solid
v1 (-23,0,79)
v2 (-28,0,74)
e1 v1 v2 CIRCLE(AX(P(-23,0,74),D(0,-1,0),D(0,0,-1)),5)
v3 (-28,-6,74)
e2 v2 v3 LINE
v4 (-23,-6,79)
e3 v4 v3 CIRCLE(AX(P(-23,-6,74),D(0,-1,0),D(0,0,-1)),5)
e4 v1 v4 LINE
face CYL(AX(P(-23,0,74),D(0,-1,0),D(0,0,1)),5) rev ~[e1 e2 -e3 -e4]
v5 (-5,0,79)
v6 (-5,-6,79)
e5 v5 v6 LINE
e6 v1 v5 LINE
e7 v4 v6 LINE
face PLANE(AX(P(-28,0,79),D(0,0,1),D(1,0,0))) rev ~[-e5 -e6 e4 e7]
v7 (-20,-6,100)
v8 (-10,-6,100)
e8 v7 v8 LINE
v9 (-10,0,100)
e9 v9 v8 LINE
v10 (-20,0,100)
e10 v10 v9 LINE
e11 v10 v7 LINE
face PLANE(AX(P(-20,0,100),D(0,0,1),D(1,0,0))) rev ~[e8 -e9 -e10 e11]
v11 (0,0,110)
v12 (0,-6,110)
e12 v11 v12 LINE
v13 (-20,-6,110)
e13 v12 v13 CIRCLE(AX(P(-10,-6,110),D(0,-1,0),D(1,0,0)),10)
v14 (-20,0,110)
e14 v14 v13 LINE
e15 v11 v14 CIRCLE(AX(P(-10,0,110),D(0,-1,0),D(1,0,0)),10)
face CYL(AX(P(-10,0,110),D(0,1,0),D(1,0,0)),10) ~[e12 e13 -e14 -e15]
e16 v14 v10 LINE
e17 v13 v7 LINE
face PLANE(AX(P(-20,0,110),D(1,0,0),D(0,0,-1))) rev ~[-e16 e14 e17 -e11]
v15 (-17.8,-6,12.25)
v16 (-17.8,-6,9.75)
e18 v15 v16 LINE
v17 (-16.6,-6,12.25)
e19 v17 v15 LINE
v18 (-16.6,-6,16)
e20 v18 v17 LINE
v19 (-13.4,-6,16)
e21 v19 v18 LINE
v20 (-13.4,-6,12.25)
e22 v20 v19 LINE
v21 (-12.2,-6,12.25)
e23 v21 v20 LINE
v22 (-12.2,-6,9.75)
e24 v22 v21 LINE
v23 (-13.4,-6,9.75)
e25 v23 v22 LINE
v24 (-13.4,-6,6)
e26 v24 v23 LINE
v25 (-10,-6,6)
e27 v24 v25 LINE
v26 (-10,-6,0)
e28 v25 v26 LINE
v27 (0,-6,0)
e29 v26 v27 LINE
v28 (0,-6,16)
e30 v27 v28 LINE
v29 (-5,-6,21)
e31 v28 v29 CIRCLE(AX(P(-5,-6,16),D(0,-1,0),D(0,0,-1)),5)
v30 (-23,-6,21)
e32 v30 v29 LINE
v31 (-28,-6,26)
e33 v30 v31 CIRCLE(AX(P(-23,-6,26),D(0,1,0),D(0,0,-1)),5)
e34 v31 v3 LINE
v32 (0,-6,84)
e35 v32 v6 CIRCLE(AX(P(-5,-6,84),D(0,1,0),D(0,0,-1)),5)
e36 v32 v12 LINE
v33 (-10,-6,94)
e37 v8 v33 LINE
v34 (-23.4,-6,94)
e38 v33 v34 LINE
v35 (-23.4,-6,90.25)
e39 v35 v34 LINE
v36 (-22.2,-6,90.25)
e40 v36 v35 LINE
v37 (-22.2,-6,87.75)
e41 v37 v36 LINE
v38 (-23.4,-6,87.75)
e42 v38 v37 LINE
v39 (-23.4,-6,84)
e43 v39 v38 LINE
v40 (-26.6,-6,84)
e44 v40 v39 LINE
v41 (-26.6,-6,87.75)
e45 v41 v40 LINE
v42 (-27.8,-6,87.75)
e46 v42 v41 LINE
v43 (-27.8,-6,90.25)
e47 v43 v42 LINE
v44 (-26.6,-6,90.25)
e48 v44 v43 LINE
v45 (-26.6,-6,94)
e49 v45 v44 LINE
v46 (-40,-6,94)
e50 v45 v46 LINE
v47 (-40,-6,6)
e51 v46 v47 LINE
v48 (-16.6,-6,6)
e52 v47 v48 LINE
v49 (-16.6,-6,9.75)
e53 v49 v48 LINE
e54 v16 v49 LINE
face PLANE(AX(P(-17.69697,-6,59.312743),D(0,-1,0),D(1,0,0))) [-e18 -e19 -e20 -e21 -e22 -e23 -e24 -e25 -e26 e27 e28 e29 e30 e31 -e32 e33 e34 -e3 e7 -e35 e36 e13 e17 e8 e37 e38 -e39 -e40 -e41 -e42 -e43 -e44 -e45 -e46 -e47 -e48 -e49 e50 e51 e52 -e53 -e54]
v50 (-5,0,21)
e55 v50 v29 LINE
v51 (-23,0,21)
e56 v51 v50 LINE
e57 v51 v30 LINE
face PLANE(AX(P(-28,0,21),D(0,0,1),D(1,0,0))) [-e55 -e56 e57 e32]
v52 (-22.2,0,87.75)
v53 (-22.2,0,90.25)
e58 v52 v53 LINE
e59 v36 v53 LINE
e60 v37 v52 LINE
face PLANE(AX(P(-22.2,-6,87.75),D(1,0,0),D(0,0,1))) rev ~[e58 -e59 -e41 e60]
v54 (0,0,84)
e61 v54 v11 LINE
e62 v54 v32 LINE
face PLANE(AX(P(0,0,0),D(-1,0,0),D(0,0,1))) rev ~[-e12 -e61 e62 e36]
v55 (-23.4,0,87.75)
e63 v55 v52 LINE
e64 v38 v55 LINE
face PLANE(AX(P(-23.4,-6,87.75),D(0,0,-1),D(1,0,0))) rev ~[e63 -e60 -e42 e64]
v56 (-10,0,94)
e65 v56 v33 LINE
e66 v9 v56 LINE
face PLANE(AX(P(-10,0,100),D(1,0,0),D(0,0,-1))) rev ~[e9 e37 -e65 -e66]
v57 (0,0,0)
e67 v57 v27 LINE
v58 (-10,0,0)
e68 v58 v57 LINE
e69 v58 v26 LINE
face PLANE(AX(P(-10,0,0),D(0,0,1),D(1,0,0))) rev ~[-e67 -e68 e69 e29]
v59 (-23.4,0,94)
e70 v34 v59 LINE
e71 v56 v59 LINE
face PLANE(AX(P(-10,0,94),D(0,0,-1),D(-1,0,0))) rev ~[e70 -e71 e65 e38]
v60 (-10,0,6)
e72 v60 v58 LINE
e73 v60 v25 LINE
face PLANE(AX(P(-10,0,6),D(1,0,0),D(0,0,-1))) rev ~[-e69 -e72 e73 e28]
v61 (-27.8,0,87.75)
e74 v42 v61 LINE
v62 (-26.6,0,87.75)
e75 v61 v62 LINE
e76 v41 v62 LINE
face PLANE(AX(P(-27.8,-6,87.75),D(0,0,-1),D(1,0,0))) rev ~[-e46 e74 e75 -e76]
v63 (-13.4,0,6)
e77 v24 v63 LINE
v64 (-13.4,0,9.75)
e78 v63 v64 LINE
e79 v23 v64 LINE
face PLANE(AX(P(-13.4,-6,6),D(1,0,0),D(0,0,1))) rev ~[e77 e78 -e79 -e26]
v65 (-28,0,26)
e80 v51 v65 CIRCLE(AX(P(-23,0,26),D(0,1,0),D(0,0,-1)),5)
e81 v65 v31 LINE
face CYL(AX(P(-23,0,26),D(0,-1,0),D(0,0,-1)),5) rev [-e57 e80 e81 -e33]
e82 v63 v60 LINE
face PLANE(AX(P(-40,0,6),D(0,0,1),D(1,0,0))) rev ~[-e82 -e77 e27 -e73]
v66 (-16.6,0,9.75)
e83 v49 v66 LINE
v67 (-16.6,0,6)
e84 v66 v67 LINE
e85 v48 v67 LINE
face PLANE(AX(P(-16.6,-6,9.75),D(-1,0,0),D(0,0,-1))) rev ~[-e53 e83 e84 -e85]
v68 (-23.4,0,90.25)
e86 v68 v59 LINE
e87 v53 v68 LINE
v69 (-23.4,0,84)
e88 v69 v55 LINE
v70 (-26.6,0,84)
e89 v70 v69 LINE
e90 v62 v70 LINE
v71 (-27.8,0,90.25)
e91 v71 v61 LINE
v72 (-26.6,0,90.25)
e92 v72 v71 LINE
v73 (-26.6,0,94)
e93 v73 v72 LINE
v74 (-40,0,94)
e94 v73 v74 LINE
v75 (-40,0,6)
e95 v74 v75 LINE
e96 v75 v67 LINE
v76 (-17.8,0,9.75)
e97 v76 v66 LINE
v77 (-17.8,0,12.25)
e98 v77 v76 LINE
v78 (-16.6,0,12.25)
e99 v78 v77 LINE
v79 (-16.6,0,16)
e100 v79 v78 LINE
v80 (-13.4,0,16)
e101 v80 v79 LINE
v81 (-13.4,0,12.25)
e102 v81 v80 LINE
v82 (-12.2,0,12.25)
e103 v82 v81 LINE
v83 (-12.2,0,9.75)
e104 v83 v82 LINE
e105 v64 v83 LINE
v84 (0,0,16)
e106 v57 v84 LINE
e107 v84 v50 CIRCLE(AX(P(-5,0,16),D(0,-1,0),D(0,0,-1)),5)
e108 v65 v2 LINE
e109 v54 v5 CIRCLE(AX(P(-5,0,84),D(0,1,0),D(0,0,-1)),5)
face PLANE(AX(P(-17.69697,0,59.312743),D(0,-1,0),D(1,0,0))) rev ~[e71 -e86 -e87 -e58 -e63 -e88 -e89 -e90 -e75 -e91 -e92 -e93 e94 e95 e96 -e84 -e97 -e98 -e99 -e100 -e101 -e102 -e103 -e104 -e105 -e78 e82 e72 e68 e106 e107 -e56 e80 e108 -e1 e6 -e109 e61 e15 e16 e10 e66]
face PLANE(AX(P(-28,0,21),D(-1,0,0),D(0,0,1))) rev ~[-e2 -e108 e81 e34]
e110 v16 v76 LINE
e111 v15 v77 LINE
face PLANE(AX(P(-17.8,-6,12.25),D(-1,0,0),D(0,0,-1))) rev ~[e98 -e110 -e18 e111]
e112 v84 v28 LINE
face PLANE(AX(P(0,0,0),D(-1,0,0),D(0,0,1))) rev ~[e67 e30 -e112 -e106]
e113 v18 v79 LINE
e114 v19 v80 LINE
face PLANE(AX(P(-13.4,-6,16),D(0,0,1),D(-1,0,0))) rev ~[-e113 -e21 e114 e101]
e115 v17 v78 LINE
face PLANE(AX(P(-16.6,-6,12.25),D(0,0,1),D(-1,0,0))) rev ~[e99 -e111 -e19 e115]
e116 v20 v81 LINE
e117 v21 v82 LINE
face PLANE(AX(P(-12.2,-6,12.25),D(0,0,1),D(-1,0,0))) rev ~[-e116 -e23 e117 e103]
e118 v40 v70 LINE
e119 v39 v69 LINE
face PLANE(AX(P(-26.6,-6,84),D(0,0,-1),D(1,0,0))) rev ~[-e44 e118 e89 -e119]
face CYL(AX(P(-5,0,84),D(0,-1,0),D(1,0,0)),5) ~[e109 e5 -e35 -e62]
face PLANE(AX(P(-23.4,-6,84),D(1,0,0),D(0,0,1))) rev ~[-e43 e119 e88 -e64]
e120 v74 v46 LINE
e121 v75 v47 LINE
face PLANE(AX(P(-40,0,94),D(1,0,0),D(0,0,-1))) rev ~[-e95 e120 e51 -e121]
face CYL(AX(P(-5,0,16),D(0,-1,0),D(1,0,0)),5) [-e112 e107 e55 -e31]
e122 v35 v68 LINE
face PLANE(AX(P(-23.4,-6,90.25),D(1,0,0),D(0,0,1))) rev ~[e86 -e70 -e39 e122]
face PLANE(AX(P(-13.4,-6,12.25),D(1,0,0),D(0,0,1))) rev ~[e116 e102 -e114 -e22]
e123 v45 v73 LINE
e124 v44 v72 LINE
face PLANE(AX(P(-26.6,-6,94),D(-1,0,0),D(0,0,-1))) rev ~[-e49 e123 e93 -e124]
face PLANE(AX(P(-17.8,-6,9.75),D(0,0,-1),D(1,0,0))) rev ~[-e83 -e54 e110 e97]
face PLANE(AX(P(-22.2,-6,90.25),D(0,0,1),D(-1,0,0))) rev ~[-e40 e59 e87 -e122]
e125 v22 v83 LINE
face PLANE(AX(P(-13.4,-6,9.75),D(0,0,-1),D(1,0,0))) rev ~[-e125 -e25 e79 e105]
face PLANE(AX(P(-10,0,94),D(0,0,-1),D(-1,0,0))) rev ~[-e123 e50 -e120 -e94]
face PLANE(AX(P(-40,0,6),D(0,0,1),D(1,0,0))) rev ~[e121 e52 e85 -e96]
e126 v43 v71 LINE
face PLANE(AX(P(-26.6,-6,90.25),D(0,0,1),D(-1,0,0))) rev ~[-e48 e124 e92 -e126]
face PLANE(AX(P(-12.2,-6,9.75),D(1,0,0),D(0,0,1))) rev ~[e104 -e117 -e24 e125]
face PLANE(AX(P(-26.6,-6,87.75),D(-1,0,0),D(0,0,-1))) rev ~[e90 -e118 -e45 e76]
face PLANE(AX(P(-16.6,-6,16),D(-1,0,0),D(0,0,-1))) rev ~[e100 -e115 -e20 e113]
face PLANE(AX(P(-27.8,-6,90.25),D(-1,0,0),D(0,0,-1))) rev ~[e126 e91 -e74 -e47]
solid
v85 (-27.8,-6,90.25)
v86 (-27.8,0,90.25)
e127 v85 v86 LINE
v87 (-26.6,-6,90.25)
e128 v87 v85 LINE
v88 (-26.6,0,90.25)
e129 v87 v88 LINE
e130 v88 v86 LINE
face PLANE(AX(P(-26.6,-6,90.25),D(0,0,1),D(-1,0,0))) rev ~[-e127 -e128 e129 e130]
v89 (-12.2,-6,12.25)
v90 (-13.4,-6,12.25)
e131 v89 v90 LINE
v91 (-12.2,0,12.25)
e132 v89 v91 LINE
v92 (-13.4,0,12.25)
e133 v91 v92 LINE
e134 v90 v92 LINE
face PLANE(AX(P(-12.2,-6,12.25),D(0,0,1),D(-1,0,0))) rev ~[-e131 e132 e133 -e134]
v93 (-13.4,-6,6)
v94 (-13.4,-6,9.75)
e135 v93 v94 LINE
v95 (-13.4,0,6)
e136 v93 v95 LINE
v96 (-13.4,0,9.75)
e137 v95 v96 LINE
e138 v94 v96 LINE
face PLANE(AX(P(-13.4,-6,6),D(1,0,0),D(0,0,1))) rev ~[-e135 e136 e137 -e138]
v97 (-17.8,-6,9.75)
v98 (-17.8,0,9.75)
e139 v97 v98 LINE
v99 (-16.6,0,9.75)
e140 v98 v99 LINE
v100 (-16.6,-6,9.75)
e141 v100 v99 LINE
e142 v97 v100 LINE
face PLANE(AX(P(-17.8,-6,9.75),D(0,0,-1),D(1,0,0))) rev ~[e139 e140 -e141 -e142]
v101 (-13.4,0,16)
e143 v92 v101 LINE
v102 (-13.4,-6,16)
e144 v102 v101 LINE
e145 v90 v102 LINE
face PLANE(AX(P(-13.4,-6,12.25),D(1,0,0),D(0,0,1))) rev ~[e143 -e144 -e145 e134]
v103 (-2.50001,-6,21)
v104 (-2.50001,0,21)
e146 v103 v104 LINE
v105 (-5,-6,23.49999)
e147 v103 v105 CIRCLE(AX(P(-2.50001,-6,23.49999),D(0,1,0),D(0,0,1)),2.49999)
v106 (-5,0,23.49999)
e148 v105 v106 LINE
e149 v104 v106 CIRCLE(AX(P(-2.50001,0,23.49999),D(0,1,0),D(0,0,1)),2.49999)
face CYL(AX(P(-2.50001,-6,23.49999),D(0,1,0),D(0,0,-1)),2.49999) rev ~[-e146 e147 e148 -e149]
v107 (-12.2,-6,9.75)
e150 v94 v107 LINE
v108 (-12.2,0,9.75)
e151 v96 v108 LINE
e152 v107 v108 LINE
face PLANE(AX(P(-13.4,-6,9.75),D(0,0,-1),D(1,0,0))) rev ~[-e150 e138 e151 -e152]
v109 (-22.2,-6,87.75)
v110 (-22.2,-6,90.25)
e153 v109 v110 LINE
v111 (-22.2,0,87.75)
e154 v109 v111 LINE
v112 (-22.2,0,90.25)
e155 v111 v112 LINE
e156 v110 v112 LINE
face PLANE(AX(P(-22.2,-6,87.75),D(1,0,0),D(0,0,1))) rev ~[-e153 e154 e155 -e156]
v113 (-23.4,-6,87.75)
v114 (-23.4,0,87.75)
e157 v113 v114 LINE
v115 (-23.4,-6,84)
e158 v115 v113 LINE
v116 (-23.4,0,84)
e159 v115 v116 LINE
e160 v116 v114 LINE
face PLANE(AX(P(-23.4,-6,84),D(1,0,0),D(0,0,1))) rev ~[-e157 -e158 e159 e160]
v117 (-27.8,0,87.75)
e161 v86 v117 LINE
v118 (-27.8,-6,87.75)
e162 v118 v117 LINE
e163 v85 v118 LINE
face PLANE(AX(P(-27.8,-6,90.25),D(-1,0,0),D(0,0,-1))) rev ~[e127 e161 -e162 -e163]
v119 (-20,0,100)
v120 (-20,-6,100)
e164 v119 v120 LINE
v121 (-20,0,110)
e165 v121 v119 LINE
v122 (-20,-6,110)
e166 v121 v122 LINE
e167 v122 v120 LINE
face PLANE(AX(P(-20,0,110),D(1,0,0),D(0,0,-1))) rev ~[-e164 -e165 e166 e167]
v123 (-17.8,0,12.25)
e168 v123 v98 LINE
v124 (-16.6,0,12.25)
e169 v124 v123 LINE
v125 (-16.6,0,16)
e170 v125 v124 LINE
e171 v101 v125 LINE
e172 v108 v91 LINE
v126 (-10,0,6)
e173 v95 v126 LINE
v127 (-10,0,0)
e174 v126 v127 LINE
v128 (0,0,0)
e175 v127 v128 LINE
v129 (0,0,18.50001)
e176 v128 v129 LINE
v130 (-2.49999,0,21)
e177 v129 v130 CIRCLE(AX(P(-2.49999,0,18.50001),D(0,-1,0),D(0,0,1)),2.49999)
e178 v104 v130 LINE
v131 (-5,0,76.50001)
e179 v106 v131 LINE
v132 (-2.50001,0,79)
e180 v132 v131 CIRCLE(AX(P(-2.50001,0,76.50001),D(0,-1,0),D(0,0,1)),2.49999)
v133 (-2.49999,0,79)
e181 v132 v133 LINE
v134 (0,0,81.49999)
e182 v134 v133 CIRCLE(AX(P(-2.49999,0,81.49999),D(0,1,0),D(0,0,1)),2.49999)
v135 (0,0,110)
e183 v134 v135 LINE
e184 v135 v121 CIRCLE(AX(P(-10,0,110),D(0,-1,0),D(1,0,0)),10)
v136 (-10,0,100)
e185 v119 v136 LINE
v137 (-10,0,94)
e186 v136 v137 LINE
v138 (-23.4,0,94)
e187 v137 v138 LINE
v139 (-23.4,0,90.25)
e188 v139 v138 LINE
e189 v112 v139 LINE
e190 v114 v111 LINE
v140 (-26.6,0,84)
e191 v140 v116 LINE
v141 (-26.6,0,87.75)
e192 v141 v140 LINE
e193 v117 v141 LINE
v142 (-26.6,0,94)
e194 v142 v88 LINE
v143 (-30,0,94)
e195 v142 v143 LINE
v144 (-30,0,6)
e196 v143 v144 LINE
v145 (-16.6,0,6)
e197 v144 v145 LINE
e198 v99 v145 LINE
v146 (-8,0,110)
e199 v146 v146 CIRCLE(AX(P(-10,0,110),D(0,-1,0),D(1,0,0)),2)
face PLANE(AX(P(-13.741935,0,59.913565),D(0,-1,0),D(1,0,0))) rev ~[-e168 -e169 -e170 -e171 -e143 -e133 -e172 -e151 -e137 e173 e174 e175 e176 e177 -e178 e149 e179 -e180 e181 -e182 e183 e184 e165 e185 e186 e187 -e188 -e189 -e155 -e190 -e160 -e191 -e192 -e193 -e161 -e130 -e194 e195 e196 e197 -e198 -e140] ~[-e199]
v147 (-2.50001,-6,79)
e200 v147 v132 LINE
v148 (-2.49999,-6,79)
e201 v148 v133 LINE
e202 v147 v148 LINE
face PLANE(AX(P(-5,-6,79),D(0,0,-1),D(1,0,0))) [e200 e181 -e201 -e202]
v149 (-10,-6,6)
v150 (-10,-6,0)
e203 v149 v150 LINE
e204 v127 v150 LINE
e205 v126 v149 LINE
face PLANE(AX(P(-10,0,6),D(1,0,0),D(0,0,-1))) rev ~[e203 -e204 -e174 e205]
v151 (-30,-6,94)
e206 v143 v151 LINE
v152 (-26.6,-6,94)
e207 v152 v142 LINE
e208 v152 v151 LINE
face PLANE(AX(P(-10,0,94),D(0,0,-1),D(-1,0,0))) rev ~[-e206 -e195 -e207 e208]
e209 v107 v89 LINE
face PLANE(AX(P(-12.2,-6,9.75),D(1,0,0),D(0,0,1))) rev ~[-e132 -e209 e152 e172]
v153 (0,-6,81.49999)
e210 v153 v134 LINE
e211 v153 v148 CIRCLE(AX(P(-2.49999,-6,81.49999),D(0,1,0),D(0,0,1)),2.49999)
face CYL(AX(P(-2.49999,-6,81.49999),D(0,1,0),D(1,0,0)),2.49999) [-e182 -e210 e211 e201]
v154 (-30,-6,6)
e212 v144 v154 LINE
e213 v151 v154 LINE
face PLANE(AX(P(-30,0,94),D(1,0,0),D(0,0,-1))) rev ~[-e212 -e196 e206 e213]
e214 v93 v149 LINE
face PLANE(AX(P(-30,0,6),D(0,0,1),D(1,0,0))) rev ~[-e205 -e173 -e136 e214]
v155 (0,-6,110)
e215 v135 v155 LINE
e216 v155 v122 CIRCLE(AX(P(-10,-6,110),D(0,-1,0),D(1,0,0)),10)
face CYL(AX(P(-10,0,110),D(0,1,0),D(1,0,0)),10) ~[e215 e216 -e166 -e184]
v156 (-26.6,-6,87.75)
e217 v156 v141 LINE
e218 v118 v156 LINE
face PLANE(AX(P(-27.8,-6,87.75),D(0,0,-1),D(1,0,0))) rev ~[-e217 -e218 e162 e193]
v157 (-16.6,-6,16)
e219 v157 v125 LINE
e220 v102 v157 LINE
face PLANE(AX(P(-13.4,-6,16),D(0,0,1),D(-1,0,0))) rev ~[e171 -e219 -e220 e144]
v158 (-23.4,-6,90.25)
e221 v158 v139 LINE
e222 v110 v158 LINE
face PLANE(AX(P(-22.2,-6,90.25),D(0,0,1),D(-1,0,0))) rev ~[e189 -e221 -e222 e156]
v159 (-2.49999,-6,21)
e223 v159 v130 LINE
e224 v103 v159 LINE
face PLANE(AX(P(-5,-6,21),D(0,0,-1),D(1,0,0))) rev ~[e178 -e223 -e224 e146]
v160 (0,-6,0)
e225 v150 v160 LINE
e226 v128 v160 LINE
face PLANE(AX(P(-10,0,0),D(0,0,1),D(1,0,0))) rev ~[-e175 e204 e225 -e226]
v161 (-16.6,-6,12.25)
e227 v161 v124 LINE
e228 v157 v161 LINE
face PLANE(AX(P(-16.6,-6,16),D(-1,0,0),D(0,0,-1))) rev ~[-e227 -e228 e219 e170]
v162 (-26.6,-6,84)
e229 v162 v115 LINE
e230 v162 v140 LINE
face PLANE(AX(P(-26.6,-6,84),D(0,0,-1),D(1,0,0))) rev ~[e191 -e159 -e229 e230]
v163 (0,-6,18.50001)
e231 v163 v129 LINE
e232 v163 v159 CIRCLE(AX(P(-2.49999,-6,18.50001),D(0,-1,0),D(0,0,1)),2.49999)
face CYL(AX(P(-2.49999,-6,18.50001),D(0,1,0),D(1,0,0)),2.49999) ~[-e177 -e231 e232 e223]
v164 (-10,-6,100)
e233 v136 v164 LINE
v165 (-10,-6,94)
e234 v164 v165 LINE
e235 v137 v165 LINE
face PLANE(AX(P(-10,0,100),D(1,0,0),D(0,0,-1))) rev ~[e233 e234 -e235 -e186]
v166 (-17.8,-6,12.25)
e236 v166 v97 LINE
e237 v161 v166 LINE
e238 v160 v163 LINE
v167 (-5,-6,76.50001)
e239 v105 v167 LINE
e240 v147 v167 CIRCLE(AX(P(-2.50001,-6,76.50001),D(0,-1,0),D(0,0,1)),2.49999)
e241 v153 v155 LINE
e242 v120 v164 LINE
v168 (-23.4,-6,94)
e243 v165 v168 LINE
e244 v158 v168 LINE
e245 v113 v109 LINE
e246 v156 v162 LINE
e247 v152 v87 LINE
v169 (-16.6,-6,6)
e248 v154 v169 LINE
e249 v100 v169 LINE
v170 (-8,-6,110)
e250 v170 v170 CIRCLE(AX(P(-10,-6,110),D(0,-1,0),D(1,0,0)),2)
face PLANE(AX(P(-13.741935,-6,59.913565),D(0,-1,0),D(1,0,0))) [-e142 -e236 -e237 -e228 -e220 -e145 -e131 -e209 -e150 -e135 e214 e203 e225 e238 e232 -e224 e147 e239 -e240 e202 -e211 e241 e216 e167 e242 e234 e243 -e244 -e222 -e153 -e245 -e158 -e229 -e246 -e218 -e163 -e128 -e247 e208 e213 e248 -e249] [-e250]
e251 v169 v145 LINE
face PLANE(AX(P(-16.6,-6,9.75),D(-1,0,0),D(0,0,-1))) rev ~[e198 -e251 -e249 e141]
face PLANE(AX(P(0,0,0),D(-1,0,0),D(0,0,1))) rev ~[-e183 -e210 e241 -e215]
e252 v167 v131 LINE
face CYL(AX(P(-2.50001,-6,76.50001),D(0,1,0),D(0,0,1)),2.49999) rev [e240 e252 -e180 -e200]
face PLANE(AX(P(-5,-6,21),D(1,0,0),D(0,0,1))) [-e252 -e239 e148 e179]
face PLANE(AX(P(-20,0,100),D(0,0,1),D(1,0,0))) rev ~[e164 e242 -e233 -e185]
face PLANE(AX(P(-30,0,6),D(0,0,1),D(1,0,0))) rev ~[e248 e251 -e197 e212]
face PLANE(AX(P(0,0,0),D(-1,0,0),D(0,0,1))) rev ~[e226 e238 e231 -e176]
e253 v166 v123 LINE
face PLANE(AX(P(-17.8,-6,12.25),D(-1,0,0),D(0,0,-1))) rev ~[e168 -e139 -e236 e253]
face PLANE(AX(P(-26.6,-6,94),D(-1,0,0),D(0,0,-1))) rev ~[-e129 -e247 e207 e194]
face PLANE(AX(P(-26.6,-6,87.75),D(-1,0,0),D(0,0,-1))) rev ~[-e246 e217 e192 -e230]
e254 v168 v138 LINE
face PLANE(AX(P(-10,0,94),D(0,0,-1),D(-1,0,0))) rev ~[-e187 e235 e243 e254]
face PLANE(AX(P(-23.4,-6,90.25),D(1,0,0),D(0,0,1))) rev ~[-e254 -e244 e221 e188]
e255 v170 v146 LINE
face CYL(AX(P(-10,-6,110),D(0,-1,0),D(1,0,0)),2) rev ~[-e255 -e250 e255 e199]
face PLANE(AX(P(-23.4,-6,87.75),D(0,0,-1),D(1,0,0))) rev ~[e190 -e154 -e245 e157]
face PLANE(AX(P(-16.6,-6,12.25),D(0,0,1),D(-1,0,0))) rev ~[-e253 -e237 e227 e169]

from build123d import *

# Parameters (mm, degrees)
F1_DEPTH  = 6
F3_DEPTH  = 6.001
F4_R      = 2
F5_DEPTH  = 6.001
F6_W      = 5
F6_H      = 58
F7_DEPTH  = 6.001
F8_R      = 2.49999
F10_DEPTH = 6
F11_DEPTH = 25
F12_W     = 28
F12_H     = 58
F13_DEPTH = 6
F14_R     = 5


# Not quite as in the source:
# - a fillet or chamfer is up to 0.001 mm smaller than in the source, because OpenCascade refuses the exact size


with BuildPart() as f1:
    # F0 (on Front) → F1 (new body)
    with BuildSketch(Plane.XZ):
        with BuildLine():
            Line((-10, 0), (0, 0))
            Line((0, 0), (0, 110))
            ThreePointArc((0, 110), (-10, 120), (-20, 110))
            Line((-20, 110), (-20, 100))
            Line((-20, 100), (-10, 100))
            Line((-10, 100), (-10, 94))
            Line((-10, 94), (-30, 94))
            Line((-30, 94), (-30, 6))
            Line((-30, 6), (-10, 6))
            Line((-10, 6), (-10, 0))
        make_face()
    extrude(amount=F1_DEPTH)

    # F2 (on face) → F3 (cut, through all)
    with BuildSketch(Plane.XZ.offset(6)):
        Polygon((-16.6, 6), (-15, 6), (-13.4, 6), (-13.4, 9.75), (-12.2, 9.75), (-12.2, 12.25), (-13.4, 12.25), (-13.4, 16), (-15, 16), (-16.6, 16), (-16.6, 12.25), (-17.8, 12.25), (-17.8, 9.75), (-16.6, 9.75), align=None)
        Polygon((-23.4, 94), (-25, 94), (-26.6, 94), (-26.6, 90.25), (-27.8, 90.25), (-27.8, 87.75), (-26.6, 87.75), (-26.6, 84), (-25, 84), (-23.4, 84), (-23.4, 87.75), (-22.2, 87.75), (-22.2, 90.25), (-23.4, 90.25), align=None)
    extrude(amount=-F3_DEPTH, mode=Mode.SUBTRACT)

    # F4 (on face) → F5 (cut, through all)
    with BuildSketch(Plane.XZ.offset(6)):
        with Locations((-10, 110)):
            Circle(F4_R)
    extrude(amount=-F5_DEPTH, mode=Mode.SUBTRACT)

    # F6 (on face) → F7 (cut, through all)
    with BuildSketch(Plane.XZ.offset(6)):
        with Locations((-2.5, 50)):
            Rectangle(F6_W, F6_H)
    extrude(amount=-F7_DEPTH, mode=Mode.SUBTRACT)

    # F8 (radius 2.5 in the source; OpenCascade refuses exactly that, so slightly less here)
    f8_edges = [f1.edges().sort_by_distance(p)[0] for p in [
        (-5, -3, 79),
        (0, -3, 79),
        (-5, -3, 21),
        (0, -3, 21),
    ]]
    fillet(f8_edges, radius=F8_R)


with BuildPart() as f10:
    # F9 (on Front) → F10 (new body)
    with BuildSketch(Plane.XZ):
        with BuildLine():
            Line((-10, 0), (0, 0))
            Line((0, 0), (0, 110))
            ThreePointArc((0, 110), (-10, 120), (-20, 110))
            Line((-20, 110), (-20, 100))
            Line((-20, 100), (-10, 100))
            Line((-10, 100), (-10, 94))
            Line((-10, 94), (-40, 94))
            Line((-40, 94), (-40, 6))
            Line((-40, 6), (-10, 6))
            Line((-10, 6), (-10, 0))
        make_face()
    extrude(amount=F10_DEPTH)

    # F2 (on face) → F11 (cut)
    with BuildSketch(Plane.XZ.offset(6)):
        Polygon((-16.6, 6), (-15, 6), (-13.4, 6), (-13.4, 9.75), (-12.2, 9.75), (-12.2, 12.25), (-13.4, 12.25), (-13.4, 16), (-15, 16), (-16.6, 16), (-16.6, 12.25), (-17.8, 12.25), (-17.8, 9.75), (-16.6, 9.75), align=None)
        Polygon((-23.4, 94), (-25, 94), (-26.6, 94), (-26.6, 90.25), (-27.8, 90.25), (-27.8, 87.75), (-26.6, 87.75), (-26.6, 84), (-25, 84), (-23.4, 84), (-23.4, 87.75), (-22.2, 87.75), (-22.2, 90.25), (-23.4, 90.25), align=None)
    extrude(amount=-F11_DEPTH, mode=Mode.SUBTRACT)

    # F12 (on Front) → F13 (cut, through all)
    with BuildSketch(Plane.XZ):
        with Locations((-14, 50)):
            Rectangle(F12_W, F12_H)
    extrude(amount=F13_DEPTH, mode=Mode.SUBTRACT)

    # F14
    f14_edges = [f10.edges().sort_by_distance(p)[0] for p in [
        (0, -3, 79),
        (0, -3, 21),
        (-28, -3, 21),
        (-28, -3, 79),
    ]]
    fillet(f14_edges, radius=F14_R)


solid = Compound([f1.part, f10.part])
